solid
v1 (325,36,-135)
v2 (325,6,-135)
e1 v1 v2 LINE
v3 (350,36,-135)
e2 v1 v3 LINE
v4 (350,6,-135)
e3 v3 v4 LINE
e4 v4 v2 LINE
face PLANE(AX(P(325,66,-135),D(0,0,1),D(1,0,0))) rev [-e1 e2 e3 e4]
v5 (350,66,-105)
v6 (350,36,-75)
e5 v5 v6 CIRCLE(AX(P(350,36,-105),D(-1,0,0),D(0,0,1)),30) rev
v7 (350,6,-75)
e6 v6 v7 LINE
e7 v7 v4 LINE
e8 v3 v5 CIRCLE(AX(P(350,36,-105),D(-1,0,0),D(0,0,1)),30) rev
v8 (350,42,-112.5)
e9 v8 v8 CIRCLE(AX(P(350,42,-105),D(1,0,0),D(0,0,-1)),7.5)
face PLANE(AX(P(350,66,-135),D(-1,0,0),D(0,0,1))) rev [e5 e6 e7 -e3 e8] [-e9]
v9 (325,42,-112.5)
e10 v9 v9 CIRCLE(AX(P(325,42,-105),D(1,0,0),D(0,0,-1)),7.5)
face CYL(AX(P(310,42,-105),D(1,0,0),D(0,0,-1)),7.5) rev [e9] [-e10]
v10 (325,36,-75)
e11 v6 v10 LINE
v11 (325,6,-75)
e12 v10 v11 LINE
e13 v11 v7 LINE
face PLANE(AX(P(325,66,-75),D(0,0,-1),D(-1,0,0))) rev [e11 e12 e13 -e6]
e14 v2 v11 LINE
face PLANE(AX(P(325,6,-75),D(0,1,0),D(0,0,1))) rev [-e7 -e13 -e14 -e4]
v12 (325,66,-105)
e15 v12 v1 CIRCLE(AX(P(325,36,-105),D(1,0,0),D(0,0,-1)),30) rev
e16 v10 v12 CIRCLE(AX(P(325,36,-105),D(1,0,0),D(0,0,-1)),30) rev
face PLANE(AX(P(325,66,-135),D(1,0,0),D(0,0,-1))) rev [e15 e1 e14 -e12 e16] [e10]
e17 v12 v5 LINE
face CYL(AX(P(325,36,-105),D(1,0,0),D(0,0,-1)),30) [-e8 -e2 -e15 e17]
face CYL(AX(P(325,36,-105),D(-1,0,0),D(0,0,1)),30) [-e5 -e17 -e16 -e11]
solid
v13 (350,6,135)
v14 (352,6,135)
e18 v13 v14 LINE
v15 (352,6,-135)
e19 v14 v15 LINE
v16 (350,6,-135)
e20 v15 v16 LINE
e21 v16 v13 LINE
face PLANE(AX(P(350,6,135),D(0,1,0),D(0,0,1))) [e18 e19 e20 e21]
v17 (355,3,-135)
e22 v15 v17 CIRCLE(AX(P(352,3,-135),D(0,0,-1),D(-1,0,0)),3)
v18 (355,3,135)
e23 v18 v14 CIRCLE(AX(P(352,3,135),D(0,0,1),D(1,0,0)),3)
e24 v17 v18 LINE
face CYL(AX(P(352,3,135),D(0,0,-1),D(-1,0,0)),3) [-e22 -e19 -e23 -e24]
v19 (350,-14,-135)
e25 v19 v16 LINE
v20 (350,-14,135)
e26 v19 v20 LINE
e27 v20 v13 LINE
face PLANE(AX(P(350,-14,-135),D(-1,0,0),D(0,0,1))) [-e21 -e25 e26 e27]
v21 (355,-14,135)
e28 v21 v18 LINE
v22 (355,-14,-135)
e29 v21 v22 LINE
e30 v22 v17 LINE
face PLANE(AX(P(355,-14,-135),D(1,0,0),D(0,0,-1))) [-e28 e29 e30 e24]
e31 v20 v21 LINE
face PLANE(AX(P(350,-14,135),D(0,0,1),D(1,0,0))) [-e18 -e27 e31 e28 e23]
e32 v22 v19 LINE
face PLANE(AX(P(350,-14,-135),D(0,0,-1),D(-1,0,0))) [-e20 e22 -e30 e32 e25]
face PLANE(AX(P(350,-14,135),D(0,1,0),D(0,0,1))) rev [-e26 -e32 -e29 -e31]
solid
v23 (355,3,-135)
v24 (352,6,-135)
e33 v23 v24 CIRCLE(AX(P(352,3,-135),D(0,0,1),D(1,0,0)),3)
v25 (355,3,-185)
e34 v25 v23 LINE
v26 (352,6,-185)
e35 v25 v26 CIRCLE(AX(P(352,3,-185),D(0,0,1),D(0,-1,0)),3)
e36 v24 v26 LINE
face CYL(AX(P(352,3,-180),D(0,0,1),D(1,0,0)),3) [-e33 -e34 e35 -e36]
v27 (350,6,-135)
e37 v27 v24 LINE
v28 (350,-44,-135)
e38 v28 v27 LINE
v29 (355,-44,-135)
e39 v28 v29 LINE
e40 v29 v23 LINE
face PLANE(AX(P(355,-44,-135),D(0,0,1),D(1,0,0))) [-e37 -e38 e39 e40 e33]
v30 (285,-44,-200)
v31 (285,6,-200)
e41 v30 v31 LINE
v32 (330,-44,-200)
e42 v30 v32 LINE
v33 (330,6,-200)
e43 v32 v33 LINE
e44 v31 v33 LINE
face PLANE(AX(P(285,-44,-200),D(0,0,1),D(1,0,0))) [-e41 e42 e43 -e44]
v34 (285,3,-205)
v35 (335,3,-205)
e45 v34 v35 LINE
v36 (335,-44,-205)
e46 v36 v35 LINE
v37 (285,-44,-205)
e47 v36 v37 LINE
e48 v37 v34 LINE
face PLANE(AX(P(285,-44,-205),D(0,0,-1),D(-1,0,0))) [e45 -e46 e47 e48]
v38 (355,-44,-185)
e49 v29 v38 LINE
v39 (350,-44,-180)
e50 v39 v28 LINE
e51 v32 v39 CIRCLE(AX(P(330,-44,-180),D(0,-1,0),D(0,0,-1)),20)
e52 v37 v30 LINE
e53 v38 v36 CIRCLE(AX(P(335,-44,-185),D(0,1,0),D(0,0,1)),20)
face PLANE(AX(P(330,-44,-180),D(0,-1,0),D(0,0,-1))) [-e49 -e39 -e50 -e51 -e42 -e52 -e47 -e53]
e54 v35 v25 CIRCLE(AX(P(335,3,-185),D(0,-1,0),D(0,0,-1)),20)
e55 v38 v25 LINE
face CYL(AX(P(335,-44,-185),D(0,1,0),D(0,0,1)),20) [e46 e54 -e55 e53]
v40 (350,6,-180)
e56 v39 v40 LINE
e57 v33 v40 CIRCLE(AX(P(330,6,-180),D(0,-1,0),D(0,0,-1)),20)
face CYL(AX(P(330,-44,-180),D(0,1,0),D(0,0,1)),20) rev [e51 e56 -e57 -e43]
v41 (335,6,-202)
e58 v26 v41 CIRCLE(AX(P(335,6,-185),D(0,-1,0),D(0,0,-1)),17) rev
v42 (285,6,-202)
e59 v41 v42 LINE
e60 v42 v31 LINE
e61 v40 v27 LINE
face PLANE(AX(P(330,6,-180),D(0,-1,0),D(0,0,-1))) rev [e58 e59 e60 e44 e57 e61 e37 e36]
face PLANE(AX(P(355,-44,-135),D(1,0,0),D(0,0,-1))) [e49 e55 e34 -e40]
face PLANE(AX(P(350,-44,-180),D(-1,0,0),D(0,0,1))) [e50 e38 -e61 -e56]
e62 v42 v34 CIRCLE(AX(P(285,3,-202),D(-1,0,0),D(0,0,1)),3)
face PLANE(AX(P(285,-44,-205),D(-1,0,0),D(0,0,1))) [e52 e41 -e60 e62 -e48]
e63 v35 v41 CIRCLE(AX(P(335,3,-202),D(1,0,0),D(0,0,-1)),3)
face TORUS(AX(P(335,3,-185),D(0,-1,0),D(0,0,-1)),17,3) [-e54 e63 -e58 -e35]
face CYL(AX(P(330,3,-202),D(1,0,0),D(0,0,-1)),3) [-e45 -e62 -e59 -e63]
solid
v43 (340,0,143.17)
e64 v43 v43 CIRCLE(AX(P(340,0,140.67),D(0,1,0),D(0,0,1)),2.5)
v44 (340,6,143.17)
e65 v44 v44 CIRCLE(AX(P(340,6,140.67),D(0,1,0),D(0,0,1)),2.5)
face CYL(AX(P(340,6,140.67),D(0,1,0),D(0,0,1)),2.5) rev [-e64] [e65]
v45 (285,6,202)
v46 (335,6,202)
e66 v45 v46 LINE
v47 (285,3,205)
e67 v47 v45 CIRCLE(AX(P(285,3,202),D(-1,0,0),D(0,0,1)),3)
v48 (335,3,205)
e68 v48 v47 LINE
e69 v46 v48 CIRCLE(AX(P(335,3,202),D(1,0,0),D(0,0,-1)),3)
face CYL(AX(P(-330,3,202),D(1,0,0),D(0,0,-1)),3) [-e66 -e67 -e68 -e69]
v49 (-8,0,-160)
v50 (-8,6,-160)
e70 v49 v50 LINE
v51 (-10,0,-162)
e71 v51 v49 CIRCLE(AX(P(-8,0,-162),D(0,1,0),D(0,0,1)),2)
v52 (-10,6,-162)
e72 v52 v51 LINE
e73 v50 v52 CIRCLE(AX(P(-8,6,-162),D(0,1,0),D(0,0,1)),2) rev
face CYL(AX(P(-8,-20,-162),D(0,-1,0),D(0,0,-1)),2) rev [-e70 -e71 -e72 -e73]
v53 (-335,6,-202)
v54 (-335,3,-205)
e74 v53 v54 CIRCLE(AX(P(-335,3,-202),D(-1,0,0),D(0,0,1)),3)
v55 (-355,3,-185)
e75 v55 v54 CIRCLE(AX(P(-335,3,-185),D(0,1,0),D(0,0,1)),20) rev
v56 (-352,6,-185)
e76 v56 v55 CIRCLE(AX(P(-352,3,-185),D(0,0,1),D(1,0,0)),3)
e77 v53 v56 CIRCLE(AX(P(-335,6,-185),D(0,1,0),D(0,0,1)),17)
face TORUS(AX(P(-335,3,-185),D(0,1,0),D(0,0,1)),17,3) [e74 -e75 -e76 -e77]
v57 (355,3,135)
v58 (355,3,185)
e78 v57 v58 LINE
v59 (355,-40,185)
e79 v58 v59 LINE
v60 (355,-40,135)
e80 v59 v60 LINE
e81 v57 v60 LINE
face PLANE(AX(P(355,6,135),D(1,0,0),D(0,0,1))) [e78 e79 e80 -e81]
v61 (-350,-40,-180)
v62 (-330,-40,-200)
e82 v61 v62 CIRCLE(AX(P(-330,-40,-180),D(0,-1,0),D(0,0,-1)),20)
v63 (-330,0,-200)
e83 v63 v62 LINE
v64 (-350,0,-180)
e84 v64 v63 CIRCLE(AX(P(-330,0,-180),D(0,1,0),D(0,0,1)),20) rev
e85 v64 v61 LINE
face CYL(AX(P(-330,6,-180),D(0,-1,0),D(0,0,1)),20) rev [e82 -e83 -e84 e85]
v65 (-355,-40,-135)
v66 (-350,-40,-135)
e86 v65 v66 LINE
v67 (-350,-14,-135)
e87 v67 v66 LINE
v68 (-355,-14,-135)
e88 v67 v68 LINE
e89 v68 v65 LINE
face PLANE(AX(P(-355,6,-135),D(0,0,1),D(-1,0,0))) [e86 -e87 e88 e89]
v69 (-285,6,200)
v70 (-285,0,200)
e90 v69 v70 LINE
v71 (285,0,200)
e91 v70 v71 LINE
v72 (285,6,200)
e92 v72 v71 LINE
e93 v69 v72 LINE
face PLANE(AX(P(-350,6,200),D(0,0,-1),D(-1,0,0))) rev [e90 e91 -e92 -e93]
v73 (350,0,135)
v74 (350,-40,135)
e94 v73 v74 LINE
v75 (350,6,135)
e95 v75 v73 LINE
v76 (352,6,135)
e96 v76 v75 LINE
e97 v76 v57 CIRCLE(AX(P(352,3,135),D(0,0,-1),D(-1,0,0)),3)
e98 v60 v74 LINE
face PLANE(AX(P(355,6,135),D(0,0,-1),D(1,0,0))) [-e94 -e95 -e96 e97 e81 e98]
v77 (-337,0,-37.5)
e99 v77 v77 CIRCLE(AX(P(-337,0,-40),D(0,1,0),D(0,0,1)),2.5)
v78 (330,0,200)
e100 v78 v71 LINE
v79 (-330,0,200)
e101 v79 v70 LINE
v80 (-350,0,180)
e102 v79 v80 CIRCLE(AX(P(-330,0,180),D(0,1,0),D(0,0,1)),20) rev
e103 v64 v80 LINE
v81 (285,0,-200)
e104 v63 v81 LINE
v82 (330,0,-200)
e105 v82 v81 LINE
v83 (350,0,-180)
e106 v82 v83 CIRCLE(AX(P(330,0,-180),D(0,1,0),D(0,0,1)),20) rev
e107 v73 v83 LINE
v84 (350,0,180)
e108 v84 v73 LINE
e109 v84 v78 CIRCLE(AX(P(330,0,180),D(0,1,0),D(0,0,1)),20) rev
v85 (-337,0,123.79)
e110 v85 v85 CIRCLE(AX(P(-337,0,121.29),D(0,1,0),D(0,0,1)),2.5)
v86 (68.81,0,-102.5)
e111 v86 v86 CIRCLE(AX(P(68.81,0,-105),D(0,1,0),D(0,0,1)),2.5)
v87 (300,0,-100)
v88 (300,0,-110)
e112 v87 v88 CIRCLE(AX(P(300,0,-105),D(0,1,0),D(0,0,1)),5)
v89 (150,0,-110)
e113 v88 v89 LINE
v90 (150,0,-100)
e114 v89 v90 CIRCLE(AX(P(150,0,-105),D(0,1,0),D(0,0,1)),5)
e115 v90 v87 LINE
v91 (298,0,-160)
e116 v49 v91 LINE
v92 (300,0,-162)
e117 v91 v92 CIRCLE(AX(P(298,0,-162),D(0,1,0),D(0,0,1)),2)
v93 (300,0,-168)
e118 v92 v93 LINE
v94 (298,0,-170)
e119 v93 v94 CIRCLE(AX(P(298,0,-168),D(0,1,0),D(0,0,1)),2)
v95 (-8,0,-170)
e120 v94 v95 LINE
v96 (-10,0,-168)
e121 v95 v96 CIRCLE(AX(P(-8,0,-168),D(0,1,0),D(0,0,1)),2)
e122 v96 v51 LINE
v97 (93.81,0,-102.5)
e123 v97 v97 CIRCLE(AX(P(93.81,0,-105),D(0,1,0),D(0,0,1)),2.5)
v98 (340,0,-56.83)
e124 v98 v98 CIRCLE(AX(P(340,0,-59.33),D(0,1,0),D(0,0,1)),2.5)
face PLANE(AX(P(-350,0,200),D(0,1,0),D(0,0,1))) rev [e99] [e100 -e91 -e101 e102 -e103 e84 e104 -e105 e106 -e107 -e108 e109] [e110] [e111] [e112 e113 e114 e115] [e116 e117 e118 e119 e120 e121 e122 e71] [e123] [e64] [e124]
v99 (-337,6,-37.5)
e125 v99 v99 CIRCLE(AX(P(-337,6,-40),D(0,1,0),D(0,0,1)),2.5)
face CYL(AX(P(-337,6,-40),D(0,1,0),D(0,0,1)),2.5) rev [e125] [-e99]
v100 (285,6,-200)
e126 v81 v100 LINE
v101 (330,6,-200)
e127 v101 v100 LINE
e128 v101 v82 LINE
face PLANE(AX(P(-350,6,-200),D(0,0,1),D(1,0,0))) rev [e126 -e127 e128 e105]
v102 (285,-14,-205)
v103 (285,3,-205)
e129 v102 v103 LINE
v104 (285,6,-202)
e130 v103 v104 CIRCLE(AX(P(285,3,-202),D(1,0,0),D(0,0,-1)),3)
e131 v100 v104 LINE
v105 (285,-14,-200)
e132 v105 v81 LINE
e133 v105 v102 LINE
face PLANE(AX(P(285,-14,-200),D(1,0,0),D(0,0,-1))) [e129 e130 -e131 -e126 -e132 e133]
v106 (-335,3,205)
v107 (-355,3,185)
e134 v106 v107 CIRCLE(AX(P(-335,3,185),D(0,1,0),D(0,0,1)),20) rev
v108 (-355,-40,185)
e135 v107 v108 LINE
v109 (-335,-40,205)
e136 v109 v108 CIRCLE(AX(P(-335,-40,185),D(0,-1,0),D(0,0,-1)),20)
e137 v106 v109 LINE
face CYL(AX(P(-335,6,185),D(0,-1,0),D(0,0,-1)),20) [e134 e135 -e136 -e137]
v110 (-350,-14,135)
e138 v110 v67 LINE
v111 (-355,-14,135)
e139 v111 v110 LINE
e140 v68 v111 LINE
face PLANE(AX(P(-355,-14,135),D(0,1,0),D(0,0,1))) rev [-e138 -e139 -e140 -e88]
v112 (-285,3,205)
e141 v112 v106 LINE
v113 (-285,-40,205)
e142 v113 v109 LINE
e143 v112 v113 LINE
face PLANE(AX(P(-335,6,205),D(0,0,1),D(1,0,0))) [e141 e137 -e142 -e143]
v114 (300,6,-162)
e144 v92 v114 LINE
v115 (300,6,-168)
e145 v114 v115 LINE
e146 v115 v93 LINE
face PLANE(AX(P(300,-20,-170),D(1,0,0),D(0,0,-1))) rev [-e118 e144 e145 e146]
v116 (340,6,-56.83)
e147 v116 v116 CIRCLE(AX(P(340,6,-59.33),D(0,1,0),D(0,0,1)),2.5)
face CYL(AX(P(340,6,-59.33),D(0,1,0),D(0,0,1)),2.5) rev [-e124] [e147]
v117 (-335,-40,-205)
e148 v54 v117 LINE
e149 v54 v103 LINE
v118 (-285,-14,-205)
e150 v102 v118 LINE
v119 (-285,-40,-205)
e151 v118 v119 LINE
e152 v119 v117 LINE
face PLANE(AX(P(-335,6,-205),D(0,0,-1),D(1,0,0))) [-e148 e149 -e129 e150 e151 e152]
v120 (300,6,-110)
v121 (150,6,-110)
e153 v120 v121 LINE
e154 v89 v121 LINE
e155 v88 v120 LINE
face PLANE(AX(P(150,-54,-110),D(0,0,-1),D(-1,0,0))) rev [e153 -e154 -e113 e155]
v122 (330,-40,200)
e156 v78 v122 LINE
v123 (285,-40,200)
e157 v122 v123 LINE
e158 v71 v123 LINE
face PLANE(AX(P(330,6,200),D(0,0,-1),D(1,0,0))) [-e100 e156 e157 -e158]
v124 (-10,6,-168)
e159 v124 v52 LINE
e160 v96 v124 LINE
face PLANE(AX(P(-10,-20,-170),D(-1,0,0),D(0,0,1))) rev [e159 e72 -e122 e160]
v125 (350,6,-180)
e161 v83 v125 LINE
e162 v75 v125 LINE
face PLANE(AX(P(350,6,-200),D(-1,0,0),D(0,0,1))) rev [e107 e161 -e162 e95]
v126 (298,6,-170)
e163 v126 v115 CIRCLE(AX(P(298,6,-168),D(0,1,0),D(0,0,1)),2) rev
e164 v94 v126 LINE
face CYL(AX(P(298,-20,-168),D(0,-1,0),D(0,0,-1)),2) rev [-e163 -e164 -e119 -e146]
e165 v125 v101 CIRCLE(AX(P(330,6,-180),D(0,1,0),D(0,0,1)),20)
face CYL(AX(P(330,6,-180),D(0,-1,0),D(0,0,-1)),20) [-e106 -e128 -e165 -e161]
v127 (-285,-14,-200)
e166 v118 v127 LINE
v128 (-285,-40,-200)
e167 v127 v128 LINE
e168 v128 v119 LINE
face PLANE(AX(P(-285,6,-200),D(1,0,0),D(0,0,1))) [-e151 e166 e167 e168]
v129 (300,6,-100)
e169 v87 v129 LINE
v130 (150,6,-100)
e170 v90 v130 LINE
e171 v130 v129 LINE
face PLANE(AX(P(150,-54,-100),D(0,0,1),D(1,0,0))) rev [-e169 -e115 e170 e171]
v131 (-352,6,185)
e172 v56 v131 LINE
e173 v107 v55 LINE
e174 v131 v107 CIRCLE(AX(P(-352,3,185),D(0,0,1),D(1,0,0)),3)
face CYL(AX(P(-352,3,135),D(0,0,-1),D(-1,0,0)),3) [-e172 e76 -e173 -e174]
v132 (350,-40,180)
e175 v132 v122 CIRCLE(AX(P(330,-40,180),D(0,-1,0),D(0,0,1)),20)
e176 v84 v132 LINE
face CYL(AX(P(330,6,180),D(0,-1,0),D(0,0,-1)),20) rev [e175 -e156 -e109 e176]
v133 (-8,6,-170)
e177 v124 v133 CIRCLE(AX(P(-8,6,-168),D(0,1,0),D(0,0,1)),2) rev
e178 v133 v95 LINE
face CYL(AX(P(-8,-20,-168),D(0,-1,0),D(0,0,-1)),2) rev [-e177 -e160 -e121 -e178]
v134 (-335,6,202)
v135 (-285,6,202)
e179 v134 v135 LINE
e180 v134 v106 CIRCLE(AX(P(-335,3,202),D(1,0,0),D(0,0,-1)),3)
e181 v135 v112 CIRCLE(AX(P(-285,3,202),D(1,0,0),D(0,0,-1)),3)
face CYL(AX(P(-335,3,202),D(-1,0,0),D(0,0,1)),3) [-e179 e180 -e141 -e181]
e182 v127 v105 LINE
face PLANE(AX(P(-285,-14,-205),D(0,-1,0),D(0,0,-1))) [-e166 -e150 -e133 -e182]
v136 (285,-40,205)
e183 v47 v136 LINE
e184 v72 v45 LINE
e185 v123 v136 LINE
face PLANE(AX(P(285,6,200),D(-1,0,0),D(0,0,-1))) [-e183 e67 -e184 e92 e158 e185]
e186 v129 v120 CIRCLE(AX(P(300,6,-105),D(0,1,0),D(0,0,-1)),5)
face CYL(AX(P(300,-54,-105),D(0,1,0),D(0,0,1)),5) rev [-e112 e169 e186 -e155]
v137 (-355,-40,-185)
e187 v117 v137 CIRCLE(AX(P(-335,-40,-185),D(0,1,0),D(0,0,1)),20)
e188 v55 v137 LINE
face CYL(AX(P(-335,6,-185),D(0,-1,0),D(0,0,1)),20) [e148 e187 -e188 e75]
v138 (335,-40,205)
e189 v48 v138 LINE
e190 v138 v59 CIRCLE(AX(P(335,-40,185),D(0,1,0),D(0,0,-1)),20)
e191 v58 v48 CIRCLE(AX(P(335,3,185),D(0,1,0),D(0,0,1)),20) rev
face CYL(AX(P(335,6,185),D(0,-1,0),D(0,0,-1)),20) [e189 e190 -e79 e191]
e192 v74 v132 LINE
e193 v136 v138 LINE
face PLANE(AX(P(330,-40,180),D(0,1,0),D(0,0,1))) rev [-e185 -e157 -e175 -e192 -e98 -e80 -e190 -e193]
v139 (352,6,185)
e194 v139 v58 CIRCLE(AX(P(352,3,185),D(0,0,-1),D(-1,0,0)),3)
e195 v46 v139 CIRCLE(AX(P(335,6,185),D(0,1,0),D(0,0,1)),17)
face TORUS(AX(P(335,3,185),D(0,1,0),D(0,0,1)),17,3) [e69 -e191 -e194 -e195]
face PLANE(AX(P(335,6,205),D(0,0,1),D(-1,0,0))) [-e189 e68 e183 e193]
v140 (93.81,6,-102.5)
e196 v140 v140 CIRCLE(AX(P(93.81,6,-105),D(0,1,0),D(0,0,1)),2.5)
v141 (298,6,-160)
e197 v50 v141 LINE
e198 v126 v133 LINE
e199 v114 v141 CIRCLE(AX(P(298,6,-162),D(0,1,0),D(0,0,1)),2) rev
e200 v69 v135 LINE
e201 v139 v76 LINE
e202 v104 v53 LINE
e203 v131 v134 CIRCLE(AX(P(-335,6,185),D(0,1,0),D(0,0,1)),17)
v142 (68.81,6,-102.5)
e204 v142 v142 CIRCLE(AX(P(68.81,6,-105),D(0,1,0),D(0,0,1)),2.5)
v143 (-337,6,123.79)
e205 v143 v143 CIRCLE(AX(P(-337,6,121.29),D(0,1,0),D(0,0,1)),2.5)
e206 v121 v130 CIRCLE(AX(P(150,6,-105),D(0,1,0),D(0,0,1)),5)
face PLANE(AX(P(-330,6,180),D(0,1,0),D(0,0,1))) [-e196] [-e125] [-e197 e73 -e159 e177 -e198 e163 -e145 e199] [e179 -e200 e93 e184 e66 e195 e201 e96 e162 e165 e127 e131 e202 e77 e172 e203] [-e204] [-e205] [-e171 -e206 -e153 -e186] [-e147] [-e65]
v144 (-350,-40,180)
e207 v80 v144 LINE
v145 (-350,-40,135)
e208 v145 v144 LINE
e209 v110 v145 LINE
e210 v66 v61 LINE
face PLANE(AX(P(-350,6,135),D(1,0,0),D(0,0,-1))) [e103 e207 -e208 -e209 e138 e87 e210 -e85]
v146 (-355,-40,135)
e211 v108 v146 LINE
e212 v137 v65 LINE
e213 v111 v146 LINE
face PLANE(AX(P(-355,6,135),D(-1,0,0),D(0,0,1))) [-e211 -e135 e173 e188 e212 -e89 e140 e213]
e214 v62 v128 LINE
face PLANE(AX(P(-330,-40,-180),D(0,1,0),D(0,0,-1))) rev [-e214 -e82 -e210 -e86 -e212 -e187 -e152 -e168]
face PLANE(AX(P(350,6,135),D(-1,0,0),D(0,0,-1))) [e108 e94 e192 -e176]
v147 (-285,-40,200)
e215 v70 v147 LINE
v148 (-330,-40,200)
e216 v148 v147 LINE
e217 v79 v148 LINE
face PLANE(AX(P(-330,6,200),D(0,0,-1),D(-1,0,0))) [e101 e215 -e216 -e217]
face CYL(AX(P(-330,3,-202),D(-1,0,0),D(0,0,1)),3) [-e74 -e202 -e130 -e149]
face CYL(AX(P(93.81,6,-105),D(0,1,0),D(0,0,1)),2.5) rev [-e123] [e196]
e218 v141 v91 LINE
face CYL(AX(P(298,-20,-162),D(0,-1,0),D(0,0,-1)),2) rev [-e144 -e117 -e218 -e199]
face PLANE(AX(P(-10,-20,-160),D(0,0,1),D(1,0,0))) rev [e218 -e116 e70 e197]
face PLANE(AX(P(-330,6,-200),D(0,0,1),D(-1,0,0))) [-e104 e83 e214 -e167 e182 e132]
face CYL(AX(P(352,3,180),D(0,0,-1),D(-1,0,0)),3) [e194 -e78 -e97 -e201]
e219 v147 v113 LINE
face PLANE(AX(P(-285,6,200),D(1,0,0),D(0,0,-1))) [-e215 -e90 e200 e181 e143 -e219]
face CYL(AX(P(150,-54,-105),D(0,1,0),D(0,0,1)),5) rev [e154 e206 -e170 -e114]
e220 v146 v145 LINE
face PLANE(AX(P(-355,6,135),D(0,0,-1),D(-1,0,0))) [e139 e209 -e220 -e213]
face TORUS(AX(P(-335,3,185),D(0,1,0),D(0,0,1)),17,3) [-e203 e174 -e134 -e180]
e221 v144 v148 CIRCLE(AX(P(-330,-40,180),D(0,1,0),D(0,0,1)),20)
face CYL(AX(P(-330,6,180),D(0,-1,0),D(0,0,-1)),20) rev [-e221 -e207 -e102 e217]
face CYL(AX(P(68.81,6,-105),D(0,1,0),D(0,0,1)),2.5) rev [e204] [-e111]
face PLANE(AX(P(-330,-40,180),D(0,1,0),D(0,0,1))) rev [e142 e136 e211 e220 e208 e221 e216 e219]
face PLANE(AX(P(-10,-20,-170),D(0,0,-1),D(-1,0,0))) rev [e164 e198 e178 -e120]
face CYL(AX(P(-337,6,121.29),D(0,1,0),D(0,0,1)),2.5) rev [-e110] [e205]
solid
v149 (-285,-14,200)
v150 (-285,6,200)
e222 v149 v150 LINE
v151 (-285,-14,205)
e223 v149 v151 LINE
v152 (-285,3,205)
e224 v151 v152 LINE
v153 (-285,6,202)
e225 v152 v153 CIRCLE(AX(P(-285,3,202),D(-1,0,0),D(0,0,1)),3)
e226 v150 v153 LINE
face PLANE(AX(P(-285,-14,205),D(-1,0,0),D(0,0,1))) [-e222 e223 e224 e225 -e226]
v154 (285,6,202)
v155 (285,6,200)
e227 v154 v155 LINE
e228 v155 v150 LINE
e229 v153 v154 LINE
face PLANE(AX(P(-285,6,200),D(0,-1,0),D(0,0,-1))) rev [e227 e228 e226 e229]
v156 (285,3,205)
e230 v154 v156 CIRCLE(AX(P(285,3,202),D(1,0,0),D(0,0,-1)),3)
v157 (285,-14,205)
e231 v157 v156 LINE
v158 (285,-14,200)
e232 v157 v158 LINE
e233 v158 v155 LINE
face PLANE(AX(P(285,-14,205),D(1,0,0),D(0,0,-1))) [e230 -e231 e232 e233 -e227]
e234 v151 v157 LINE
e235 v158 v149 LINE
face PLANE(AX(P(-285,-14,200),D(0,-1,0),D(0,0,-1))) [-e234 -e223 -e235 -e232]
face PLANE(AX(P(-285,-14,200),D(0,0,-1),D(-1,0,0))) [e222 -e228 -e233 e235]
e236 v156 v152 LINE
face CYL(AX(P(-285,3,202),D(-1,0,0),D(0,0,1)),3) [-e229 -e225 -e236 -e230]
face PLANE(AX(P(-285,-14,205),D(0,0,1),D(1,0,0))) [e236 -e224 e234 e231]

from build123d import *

# Parameters (mm, degrees)
SKETCH1_W                         = 700
SKETCH1_H                         = 400
BOSS_EXTRUDE1_DEPTH               = 6
SKETCH3_W                         = 310
SKETCH3_H                         = 10
CUT_EXTRUDE1_DEPTH                = 26
FILLET1_R                         = 2
FILLET2_R                         = 20
BOSS_EXTRUDE2_START               = -6
BOSS_EXTRUDE2_DEPTH               = 46
BOSS_EXTRUDE3_DEPTH               = 50
SKETCH10_W                        = 570
SKETCH10_H                        = 5
BOSS_EXTRUDE4_DEPTH               = 20
SKETCH11_W                        = 5
SKETCH11_H                        = 270
BOSS_EXTRUDE5_DEPTH               = 20
LPATTERN1_COUNT                   = 2
LPATTERN1_PITCH                   = 405
LPATTERN2_COUNT                   = 2
LPATTERN2_PITCH                   = 705
FILLET3_R                         = 3
FILLET4_R                         = 3
FILLET5_R                         = 3
FILLET6_R                         = 3
FILLET7_R                         = 3
F_5_0_5_DIAMETER_HOLE1_AT_2_COUNT = 2
F_5_0_5_DIAMETER_HOLE1_AT_2_PITCH = 25
SKETCH14_W                        = 25
SKETCH14_H                        = 60
BOSS_EXTRUDE6_DEPTH               = 60
FILLET8_R                         = 30
CUT_EXTRUDE2_DEPTH                = 60
SKETCH16_R                        = 7.5
CUT_EXTRUDE3_DEPTH                = 40
F_5_0_5_DIAMETER_HOLE2_AT_2_COUNT = 2
F_5_0_5_DIAMETER_HOLE2_AT_2_PITCH = 200
F_5_0_5_DIAMETER_HOLE3_AT_2_COUNT = 2
F_5_0_5_DIAMETER_HOLE3_AT_2_PITCH = 161.29


with BuildPart() as part:
    # Sketch1 → Boss-Extrude1 (new body)
    with BuildSketch(Plane(origin=(0, 0, 0), x_dir=(1, 0, 0), z_dir=(0, 1, 0))):
        Rectangle(SKETCH1_W, SKETCH1_H)
    extrude(amount=BOSS_EXTRUDE1_DEPTH)

    # Sketch3 → Cut-Extrude1 (cut)
    with BuildSketch(Plane(origin=(0, 6, 0), x_dir=(-1, 0, 0), z_dir=(0, 1, 0))):
        with Locations((-145, -165)):
            Rectangle(SKETCH3_W, SKETCH3_H)
    extrude(amount=-CUT_EXTRUDE1_DEPTH, mode=Mode.SUBTRACT)

    # Fillet1
    fillet1_edges = [part.edges().sort_by_distance(p)[0] for p in [
        (-10, 3, -160),
        (-10, 3, -170),
        (300, 3, -170),
        (300, 3, -160),
    ]]
    fillet(fillet1_edges, radius=FILLET1_R)

    # Fillet2
    fillet2_edges = [part.edges().sort_by_distance(p)[0] for p in [
        (-350, 3, -200),
        (350, 3, -200),
        (350, 3, 200),
        (-350, 3, 200),
    ]]
    fillet(fillet2_edges, radius=FILLET2_R)


with BuildPart() as body_2:
    # Sketch8 → Boss-Extrude2 (new body)
    with BuildSketch(Plane.XZ.offset(BOSS_EXTRUDE2_START)):
        with BuildLine():
            Line((-355, 135), (-355, 185))
            ThreePointArc((-355, 185), (-349.142135624, 199.142135624), (-335, 205))
            Line((-335, 205), (-285, 205))
            Line((-285, 205), (-285, 200))
            Line((-285, 200), (-330, 200))
            ThreePointArc((-330, 200), (-344.142135624, 194.142135624), (-350, 180))
            Line((-350, 180), (-350, 135))
            Line((-350, 135), (-355, 135))
        make_face()
    boss_extrude2 = extrude(amount=BOSS_EXTRUDE2_DEPTH)


with BuildPart() as part_1:
    add(part.part)

    # Mirror3: Boss-Extrude2 across plane
    add(boss_extrude2.mirror(Plane.XY))

    # Mirror6: Boss-Extrude2 across plane
    add(boss_extrude2.mirror(Plane(origin=(0, 0, 0), x_dir=(0, 0, 1), z_dir=(1, 0, 0))))


with BuildPart() as body_3:
    # Sketch9 → Boss-Extrude3 (new body)
    with BuildSketch(Plane(origin=(0, 6, 0), x_dir=(-1, 0, 0), z_dir=(0, 1, 0))):
        with BuildLine():
            Line((-355, -135), (-355, -185))
            ThreePointArc((-355, -185), (-349.142135624, -199.142135624), (-335, -205))
            Line((-335, -205), (-285, -205))
            Line((-285, -205), (-285, -200))
            Line((-285, -200), (-330, -200))
            ThreePointArc((-330, -200), (-344.142135624, -194.142135624), (-350, -180))
            Line((-350, -180), (-350, -135))
            Line((-350, -135), (-355, -135))
        make_face()
    extrude(amount=-BOSS_EXTRUDE3_DEPTH)

    # Fillet6
    fillet6_edges = [body_3.edges().sort_by_distance(p)[0] for p in [
        (355, 6, -160),
        (310, 6, -205),
        (349.142135624, 6, -199.142135624),
    ]]
    fillet(fillet6_edges, radius=FILLET6_R)


with BuildPart() as body_4:
    # Sketch10 → Boss-Extrude4 (new body)
    with BuildSketch(Plane(origin=(0, 6, 0), x_dir=(-1, 0, 0), z_dir=(0, 1, 0))):
        with Locations((0, 202.5)):
            Rectangle(SKETCH10_W, SKETCH10_H)
    boss_extrude4 = extrude(amount=-BOSS_EXTRUDE4_DEPTH)

    # Fillet3
    fillet3_edges = [body_4.edges().sort_by_distance(p)[0] for p in [
        (0, 6, 205),
    ]]
    fillet(fillet3_edges, radius=FILLET3_R)


with BuildPart() as body_5:
    # Sketch11 → Boss-Extrude5 (new body)
    with BuildSketch(Plane(origin=(0, 6, 0), x_dir=(-1, 0, 0), z_dir=(0, 1, 0))):
        with Locations((-352.5, 0)):
            Rectangle(SKETCH11_W, SKETCH11_H)
    boss_extrude5 = extrude(amount=-BOSS_EXTRUDE5_DEPTH)

    # Fillet4
    fillet4_edges = [body_5.edges().sort_by_distance(p)[0] for p in [
        (355, 6, 0),
    ]]
    fillet(fillet4_edges, radius=FILLET4_R)


with BuildPart() as part_2:
    add(part_1.part)

    # LPattern1: Boss-Extrude4 ×2
    with Locations(*[(0, 0, -i * LPATTERN1_PITCH) for i in range(1, LPATTERN1_COUNT)]):
        add(boss_extrude4)

    add(body_2.part)  # LPattern2 merges body 2
    # LPattern2: Boss-Extrude5 ×2
    with Locations(*[(-i * LPATTERN2_PITCH, 0, 0) for i in range(1, LPATTERN2_COUNT)]):
        add(boss_extrude5)

    # Fillet5
    fillet5_edges = [part_2.edges().sort_by_distance(p)[0] for p in [
        (310, 6, 205),
        (349.142135624, 6, 199.142135624),
        (355, 6, 160),
    ]]
    fillet(fillet5_edges, radius=FILLET5_R)

    # Fillet7
    fillet7_edges = [part_2.edges().sort_by_distance(p)[0] for p in [
        (-310, 6, 205),
        (-349.142135624, 6, 199.142135624),
        (-355, 6, 0),
        (-25, 6, -205),
        (-349.142135624, 6, -199.142135624),
    ]]
    fillet(fillet7_edges, radius=FILLET7_R)

    # Sketch12 → Ø5.0 (5) Diameter Hole1 (revolve, cut)
    with BuildSketch(Plane(origin=(68.81, 6, -105), x_dir=(0, 0, 1), z_dir=(1, 0, 0))):
        Polygon((0, 0), (0, 12.502151548), (2.5, 11), (2.5, 0), align=None)
    f_5_0_5_diameter_hole1 = revolve(axis=Axis((68.81, 12.35, -105), (0, -1, 0)), mode=Mode.SUBTRACT)

    # Ø5.0 (5) Diameter Hole1 at 2: Ø5.0 (5) Diameter Hole1 ×2
    with Locations(*[(i * F_5_0_5_DIAMETER_HOLE1_AT_2_PITCH, 0, 0) for i in range(1, F_5_0_5_DIAMETER_HOLE1_AT_2_COUNT)]):
        add(f_5_0_5_diameter_hole1, mode=Mode.SUBTRACT)

    # Sketch15 → Cut-Extrude2 (cut)
    with BuildSketch(Plane(origin=(0, 6, 0), x_dir=(-1, 0, 0), z_dir=(0, 1, 0))):
        with BuildLine():
            Line((-150, -110), (-300, -110))
            ThreePointArc((-300, -110), (-305, -105), (-300, -100))
            Line((-300, -100), (-150, -100))
            ThreePointArc((-150, -100), (-145, -105), (-150, -110))
        make_face()
    extrude(amount=-CUT_EXTRUDE2_DEPTH, mode=Mode.SUBTRACT)

    # Sketch17 → Ø5.0 (5) Diameter Hole2 (revolve, cut)
    with BuildSketch(Plane(origin=(340, 6, 140.67), x_dir=(0, 0, 1), z_dir=(1, 0, 0))):
        Polygon((0, 0), (0, 12.502151548), (2.5, 11), (2.5, 0), align=None)
    f_5_0_5_diameter_hole2 = revolve(axis=Axis((340, 12.35, 140.67), (0, -1, 0)), mode=Mode.SUBTRACT)

    # Ø5.0 (5) Diameter Hole2 at 2: Ø5.0 (5) Diameter Hole2 ×2
    with Locations(*[(0, 0, -i * F_5_0_5_DIAMETER_HOLE2_AT_2_PITCH) for i in range(1, F_5_0_5_DIAMETER_HOLE2_AT_2_COUNT)]):
        add(f_5_0_5_diameter_hole2, mode=Mode.SUBTRACT)

    # Sketch19 → Ø5.0 (5) Diameter Hole3 (revolve, cut)
    with BuildSketch(Plane(origin=(-337, 6, -40), x_dir=(0, 0, 1), z_dir=(1, 0, 0))):
        Polygon((0, 0), (0, 12.502151548), (2.5, 11), (2.5, 0), align=None)
    f_5_0_5_diameter_hole3 = revolve(axis=Axis((-337, 12.35, -40), (0, -1, 0)), mode=Mode.SUBTRACT)

    # Ø5.0 (5) Diameter Hole3 at 2: Ø5.0 (5) Diameter Hole3 ×2
    with Locations(*[(0, 0, i * F_5_0_5_DIAMETER_HOLE3_AT_2_PITCH) for i in range(1, F_5_0_5_DIAMETER_HOLE3_AT_2_COUNT)]):
        add(f_5_0_5_diameter_hole3, mode=Mode.SUBTRACT)


with BuildPart() as body_5_2:
    # Sketch14 → Boss-Extrude6 (new body)
    with BuildSketch(Plane(origin=(0, 6, 0), x_dir=(-1, 0, 0), z_dir=(0, 1, 0))):
        with Locations((-337.5, -105)):
            Rectangle(SKETCH14_W, SKETCH14_H)
    extrude(amount=BOSS_EXTRUDE6_DEPTH)

    # Fillet8
    fillet8_edges = [body_5_2.edges().sort_by_distance(p)[0] for p in [
        (337.5, 66, -135),
        (337.5, 66, -75),
    ]]
    fillet(fillet8_edges, radius=FILLET8_R - 0.0001)  # a hair under: the kernel refuses the full size

    # Sketch16 → Cut-Extrude3 (cut)
    with BuildSketch(Plane(origin=(350, 0, 0), x_dir=(0, 0, -1), z_dir=(1, 0, 0))):
        with Locations((105, 42)):
            Circle(SKETCH16_R)
    extrude(amount=-CUT_EXTRUDE3_DEPTH, mode=Mode.SUBTRACT)


solid = Compound([body_3.part, body_4.part, body_5.part, part_2.part, body_5_2.part])
